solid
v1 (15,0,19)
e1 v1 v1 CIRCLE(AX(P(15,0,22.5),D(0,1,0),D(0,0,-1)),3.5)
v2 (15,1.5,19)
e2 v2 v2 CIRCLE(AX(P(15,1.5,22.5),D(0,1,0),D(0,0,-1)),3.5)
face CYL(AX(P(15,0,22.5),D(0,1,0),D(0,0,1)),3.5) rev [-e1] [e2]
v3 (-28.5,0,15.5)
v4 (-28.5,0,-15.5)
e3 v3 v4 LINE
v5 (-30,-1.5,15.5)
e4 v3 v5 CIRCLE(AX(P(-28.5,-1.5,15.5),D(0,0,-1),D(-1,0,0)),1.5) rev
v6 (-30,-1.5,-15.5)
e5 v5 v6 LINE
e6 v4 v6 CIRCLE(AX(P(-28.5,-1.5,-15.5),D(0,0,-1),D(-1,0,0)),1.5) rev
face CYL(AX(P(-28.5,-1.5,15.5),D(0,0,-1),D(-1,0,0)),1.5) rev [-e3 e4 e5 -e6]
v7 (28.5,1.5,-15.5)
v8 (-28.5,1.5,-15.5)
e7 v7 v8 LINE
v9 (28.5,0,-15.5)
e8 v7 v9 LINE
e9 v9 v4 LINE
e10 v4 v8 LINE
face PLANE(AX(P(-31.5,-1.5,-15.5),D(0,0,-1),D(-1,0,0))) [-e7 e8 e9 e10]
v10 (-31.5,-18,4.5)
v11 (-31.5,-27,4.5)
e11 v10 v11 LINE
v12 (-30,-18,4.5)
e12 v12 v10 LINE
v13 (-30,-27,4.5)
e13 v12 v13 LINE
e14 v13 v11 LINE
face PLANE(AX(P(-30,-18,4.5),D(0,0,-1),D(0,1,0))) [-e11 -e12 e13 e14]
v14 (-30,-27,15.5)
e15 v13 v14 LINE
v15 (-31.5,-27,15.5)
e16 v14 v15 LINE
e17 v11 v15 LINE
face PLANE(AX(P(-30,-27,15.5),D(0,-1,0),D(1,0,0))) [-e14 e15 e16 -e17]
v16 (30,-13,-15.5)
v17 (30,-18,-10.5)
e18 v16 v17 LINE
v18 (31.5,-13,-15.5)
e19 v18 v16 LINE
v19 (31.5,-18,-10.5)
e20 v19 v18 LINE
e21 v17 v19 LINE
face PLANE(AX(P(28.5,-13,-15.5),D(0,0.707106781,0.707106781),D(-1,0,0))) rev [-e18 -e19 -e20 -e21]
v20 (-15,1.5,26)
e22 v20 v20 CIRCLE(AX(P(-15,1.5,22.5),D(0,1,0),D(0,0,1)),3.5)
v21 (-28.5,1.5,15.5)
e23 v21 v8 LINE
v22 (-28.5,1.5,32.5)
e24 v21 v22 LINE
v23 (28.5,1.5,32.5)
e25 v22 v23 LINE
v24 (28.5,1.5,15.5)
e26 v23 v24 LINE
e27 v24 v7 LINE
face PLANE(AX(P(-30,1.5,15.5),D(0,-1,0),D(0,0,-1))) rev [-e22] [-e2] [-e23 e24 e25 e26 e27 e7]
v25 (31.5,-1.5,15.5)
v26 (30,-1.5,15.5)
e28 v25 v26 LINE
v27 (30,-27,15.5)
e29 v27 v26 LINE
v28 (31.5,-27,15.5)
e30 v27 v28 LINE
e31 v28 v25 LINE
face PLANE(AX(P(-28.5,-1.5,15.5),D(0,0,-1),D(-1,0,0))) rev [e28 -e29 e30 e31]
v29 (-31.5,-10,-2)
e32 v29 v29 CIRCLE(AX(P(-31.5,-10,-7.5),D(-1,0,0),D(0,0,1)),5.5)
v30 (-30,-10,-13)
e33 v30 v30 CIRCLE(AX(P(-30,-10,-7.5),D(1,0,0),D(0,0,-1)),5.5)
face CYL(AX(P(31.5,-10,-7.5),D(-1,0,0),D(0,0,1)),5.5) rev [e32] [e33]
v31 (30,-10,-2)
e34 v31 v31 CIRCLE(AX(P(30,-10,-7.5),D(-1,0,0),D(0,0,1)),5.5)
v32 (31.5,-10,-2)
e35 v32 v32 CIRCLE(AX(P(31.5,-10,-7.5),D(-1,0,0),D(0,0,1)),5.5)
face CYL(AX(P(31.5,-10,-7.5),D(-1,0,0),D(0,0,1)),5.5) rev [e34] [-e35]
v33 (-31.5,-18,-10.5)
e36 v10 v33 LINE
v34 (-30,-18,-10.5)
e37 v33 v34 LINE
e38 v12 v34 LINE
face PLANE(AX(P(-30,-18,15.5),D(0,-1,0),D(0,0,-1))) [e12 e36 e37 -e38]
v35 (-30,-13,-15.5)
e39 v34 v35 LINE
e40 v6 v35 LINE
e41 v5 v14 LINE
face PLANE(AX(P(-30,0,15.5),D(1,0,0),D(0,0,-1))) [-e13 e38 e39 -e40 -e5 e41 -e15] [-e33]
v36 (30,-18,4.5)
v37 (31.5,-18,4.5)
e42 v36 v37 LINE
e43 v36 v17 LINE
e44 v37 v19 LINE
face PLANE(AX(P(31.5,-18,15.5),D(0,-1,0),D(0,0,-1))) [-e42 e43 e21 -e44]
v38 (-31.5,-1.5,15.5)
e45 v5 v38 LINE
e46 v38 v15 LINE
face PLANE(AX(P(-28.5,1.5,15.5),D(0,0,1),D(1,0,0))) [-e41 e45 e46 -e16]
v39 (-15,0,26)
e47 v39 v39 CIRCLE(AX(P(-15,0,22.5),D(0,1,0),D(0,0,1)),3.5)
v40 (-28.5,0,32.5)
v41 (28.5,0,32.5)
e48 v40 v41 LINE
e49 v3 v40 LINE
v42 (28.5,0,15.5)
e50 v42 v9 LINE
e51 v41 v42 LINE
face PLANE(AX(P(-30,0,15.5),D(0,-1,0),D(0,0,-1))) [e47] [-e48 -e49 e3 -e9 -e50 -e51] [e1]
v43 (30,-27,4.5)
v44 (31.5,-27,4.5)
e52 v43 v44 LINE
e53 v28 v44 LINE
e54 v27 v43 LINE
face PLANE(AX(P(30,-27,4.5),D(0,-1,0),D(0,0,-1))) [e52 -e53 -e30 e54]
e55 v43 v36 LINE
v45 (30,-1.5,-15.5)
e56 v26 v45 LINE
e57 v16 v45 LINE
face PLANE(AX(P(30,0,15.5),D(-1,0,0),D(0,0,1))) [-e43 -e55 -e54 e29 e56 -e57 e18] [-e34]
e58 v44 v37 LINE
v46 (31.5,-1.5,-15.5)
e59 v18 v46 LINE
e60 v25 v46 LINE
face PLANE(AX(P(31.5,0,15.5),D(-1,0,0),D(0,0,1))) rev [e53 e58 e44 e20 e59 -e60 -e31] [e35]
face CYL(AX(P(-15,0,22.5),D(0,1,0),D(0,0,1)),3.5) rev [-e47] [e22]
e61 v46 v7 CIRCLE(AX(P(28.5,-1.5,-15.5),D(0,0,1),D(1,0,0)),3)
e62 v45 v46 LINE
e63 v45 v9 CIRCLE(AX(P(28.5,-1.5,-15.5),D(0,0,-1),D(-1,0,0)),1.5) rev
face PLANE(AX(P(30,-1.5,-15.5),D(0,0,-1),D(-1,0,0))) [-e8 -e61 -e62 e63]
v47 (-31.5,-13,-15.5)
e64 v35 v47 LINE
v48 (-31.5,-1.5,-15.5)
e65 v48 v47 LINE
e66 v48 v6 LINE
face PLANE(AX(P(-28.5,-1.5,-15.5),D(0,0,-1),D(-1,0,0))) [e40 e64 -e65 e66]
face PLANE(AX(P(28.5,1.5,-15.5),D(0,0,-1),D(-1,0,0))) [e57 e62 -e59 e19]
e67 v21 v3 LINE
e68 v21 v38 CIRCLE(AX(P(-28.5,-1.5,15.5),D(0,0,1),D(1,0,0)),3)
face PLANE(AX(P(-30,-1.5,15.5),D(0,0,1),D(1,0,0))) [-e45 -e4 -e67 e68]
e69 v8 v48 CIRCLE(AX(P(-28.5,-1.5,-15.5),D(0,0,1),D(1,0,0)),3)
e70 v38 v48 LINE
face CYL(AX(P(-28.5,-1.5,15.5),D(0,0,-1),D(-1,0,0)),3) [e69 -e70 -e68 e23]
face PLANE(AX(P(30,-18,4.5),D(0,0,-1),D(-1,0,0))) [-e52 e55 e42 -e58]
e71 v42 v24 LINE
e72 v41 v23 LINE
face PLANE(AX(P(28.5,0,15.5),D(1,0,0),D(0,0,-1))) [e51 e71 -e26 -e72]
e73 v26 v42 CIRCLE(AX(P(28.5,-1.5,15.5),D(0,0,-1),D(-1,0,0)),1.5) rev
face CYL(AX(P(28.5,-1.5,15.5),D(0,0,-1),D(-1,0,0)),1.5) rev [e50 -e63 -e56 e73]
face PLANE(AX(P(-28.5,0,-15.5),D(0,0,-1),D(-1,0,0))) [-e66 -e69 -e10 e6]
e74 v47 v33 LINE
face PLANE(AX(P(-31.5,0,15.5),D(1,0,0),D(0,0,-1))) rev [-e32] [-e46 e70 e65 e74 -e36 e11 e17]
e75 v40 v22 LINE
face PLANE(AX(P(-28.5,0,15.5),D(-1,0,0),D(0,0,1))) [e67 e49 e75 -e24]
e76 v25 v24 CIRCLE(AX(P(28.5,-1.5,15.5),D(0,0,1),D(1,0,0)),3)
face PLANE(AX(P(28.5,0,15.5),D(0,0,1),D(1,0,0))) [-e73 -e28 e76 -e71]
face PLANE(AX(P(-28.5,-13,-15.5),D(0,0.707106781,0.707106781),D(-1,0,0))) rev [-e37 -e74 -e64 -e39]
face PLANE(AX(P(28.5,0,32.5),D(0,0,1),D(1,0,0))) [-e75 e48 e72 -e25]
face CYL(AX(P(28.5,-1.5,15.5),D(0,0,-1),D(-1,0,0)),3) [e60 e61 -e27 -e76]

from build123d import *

# Parameters (mm, degrees)
SM_BASE_FLANGE_1_DEPTH   = 15.5
OTHER_START              = -23.68807717
OTHER_1_OUTLINE_W        = 1.5
OTHER_1_OUTLINE_H        = 10
OTHER_1_DEPTH            = 3.535533906
SKETCH_6_R               = 5.5
CUT_EXTRUDE_752_DEPTH    = 68.329414077
SKETCH_8_W               = 57
SKETCH_8_H               = 17
SM_BASE_FLANGE_1_2_DEPTH = 1.5
SKETCH_7_R               = 3.5
CUT_EXTRUDE_2_DEPTH      = 10
SKETCH_9_W               = 11
SKETCH_9_H               = 9
SM_BASE_FLANGE_2_DEPTH   = 1.5
SKETCH_12_W              = 11
SKETCH_12_H              = 9
SM_BASE_FLANGE_3_DEPTH   = 1.5


# Read off the part's stored shape, not the designer's step: Затупленный угол1
# Sheet-metal steps are written as plain solids
with BuildPart() as part:
    # Sketch 1 → Sm Base Flange 1 (new, symmetric)
    with BuildSketch(Plane.XY):
        with BuildLine():
            Line((-30, -18), (-30, -1.5))
            ThreePointArc((-30, -1.5), (-29.560660172, -0.439339828), (-28.5, 0))
            Line((-28.5, 0), (28.5, 0))
            ThreePointArc((28.5, 0), (29.560660172, -0.439339828), (30, -1.5))
            Line((30, -1.5), (30, -18))
            Line((30, -18), (31.5, -18))
            Line((31.5, -18), (31.5, -1.5))
            ThreePointArc((31.5, -1.5), (30.621320344, 0.621320344), (28.5, 1.5))
            Line((28.5, 1.5), (-28.5, 1.5))
            ThreePointArc((-28.5, 1.5), (-30.621320344, 0.621320344), (-31.5, -1.5))
            Line((-31.5, -1.5), (-31.5, -18))
            Line((-31.5, -18), (-30, -18))
        make_face()
    extrude(amount=SM_BASE_FLANGE_1_DEPTH, both=True)

    # Other 1 outline → Other 1 (cut)
    with BuildSketch(Plane(origin=(0, 0, 0), x_dir=(1, 0, 0), z_dir=(0, 0.7071067811865476, 0.7071067811865476)).offset(OTHER_START)):
        with Locations((-30.75, -2)):
            Rectangle(OTHER_1_OUTLINE_W, OTHER_1_OUTLINE_H)
        with Locations((30.75, -2)):
            Rectangle(OTHER_1_OUTLINE_W, OTHER_1_OUTLINE_H)
    extrude(amount=OTHER_1_DEPTH, mode=Mode.SUBTRACT)

    # Эскиз6 → Cut-Extrude 752 (cut, through all)
    with BuildSketch(Plane.ZY.offset(31.5)):
        with Locations((-7.5, -10)):
            Circle(SKETCH_6_R)
    extrude(amount=-CUT_EXTRUDE_752_DEPTH, mode=Mode.SUBTRACT)

    # Эскиз8 → Sm Base Flange 1 2 (add)
    with BuildSketch(Plane(origin=(0, 1.5, 0), x_dir=(1, 0, 0), z_dir=(0, 1, 0))):
        with Locations((0, -24)):
            Rectangle(SKETCH_8_W, SKETCH_8_H)
    extrude(amount=-SM_BASE_FLANGE_1_2_DEPTH)

    # Эскиз7 → Вырез-Вытянуть2 (cut)
    with BuildSketch(Plane(origin=(0, 1.5, 0), x_dir=(1, 0, 0), z_dir=(0, 1, 0))):
        with Locations(Location((-15, -22.5, 0), (0, 0, 270))):
            Circle(SKETCH_7_R)
        with Locations(Location((15, -22.5, 0), (0, 0, 90))):
            Circle(SKETCH_7_R)
    extrude(amount=-CUT_EXTRUDE_2_DEPTH, mode=Mode.SUBTRACT)

    # Эскиз9 → Выступ2 (add)
    with BuildSketch(Plane(origin=(31.5, 0, 0), x_dir=(0, 0, -1), z_dir=(1, 0, 0))):
        with Locations((-10, -22.5)):
            Rectangle(SKETCH_9_W, SKETCH_9_H)
    extrude(amount=-SM_BASE_FLANGE_2_DEPTH)

    # Эскиз12 → Выступ3 (add)
    with BuildSketch(Plane.ZY.offset(31.5)):
        with Locations((10, -22.5)):
            Rectangle(SKETCH_12_W, SKETCH_12_H)
    extrude(amount=-SM_BASE_FLANGE_3_DEPTH)


solid = part.part
